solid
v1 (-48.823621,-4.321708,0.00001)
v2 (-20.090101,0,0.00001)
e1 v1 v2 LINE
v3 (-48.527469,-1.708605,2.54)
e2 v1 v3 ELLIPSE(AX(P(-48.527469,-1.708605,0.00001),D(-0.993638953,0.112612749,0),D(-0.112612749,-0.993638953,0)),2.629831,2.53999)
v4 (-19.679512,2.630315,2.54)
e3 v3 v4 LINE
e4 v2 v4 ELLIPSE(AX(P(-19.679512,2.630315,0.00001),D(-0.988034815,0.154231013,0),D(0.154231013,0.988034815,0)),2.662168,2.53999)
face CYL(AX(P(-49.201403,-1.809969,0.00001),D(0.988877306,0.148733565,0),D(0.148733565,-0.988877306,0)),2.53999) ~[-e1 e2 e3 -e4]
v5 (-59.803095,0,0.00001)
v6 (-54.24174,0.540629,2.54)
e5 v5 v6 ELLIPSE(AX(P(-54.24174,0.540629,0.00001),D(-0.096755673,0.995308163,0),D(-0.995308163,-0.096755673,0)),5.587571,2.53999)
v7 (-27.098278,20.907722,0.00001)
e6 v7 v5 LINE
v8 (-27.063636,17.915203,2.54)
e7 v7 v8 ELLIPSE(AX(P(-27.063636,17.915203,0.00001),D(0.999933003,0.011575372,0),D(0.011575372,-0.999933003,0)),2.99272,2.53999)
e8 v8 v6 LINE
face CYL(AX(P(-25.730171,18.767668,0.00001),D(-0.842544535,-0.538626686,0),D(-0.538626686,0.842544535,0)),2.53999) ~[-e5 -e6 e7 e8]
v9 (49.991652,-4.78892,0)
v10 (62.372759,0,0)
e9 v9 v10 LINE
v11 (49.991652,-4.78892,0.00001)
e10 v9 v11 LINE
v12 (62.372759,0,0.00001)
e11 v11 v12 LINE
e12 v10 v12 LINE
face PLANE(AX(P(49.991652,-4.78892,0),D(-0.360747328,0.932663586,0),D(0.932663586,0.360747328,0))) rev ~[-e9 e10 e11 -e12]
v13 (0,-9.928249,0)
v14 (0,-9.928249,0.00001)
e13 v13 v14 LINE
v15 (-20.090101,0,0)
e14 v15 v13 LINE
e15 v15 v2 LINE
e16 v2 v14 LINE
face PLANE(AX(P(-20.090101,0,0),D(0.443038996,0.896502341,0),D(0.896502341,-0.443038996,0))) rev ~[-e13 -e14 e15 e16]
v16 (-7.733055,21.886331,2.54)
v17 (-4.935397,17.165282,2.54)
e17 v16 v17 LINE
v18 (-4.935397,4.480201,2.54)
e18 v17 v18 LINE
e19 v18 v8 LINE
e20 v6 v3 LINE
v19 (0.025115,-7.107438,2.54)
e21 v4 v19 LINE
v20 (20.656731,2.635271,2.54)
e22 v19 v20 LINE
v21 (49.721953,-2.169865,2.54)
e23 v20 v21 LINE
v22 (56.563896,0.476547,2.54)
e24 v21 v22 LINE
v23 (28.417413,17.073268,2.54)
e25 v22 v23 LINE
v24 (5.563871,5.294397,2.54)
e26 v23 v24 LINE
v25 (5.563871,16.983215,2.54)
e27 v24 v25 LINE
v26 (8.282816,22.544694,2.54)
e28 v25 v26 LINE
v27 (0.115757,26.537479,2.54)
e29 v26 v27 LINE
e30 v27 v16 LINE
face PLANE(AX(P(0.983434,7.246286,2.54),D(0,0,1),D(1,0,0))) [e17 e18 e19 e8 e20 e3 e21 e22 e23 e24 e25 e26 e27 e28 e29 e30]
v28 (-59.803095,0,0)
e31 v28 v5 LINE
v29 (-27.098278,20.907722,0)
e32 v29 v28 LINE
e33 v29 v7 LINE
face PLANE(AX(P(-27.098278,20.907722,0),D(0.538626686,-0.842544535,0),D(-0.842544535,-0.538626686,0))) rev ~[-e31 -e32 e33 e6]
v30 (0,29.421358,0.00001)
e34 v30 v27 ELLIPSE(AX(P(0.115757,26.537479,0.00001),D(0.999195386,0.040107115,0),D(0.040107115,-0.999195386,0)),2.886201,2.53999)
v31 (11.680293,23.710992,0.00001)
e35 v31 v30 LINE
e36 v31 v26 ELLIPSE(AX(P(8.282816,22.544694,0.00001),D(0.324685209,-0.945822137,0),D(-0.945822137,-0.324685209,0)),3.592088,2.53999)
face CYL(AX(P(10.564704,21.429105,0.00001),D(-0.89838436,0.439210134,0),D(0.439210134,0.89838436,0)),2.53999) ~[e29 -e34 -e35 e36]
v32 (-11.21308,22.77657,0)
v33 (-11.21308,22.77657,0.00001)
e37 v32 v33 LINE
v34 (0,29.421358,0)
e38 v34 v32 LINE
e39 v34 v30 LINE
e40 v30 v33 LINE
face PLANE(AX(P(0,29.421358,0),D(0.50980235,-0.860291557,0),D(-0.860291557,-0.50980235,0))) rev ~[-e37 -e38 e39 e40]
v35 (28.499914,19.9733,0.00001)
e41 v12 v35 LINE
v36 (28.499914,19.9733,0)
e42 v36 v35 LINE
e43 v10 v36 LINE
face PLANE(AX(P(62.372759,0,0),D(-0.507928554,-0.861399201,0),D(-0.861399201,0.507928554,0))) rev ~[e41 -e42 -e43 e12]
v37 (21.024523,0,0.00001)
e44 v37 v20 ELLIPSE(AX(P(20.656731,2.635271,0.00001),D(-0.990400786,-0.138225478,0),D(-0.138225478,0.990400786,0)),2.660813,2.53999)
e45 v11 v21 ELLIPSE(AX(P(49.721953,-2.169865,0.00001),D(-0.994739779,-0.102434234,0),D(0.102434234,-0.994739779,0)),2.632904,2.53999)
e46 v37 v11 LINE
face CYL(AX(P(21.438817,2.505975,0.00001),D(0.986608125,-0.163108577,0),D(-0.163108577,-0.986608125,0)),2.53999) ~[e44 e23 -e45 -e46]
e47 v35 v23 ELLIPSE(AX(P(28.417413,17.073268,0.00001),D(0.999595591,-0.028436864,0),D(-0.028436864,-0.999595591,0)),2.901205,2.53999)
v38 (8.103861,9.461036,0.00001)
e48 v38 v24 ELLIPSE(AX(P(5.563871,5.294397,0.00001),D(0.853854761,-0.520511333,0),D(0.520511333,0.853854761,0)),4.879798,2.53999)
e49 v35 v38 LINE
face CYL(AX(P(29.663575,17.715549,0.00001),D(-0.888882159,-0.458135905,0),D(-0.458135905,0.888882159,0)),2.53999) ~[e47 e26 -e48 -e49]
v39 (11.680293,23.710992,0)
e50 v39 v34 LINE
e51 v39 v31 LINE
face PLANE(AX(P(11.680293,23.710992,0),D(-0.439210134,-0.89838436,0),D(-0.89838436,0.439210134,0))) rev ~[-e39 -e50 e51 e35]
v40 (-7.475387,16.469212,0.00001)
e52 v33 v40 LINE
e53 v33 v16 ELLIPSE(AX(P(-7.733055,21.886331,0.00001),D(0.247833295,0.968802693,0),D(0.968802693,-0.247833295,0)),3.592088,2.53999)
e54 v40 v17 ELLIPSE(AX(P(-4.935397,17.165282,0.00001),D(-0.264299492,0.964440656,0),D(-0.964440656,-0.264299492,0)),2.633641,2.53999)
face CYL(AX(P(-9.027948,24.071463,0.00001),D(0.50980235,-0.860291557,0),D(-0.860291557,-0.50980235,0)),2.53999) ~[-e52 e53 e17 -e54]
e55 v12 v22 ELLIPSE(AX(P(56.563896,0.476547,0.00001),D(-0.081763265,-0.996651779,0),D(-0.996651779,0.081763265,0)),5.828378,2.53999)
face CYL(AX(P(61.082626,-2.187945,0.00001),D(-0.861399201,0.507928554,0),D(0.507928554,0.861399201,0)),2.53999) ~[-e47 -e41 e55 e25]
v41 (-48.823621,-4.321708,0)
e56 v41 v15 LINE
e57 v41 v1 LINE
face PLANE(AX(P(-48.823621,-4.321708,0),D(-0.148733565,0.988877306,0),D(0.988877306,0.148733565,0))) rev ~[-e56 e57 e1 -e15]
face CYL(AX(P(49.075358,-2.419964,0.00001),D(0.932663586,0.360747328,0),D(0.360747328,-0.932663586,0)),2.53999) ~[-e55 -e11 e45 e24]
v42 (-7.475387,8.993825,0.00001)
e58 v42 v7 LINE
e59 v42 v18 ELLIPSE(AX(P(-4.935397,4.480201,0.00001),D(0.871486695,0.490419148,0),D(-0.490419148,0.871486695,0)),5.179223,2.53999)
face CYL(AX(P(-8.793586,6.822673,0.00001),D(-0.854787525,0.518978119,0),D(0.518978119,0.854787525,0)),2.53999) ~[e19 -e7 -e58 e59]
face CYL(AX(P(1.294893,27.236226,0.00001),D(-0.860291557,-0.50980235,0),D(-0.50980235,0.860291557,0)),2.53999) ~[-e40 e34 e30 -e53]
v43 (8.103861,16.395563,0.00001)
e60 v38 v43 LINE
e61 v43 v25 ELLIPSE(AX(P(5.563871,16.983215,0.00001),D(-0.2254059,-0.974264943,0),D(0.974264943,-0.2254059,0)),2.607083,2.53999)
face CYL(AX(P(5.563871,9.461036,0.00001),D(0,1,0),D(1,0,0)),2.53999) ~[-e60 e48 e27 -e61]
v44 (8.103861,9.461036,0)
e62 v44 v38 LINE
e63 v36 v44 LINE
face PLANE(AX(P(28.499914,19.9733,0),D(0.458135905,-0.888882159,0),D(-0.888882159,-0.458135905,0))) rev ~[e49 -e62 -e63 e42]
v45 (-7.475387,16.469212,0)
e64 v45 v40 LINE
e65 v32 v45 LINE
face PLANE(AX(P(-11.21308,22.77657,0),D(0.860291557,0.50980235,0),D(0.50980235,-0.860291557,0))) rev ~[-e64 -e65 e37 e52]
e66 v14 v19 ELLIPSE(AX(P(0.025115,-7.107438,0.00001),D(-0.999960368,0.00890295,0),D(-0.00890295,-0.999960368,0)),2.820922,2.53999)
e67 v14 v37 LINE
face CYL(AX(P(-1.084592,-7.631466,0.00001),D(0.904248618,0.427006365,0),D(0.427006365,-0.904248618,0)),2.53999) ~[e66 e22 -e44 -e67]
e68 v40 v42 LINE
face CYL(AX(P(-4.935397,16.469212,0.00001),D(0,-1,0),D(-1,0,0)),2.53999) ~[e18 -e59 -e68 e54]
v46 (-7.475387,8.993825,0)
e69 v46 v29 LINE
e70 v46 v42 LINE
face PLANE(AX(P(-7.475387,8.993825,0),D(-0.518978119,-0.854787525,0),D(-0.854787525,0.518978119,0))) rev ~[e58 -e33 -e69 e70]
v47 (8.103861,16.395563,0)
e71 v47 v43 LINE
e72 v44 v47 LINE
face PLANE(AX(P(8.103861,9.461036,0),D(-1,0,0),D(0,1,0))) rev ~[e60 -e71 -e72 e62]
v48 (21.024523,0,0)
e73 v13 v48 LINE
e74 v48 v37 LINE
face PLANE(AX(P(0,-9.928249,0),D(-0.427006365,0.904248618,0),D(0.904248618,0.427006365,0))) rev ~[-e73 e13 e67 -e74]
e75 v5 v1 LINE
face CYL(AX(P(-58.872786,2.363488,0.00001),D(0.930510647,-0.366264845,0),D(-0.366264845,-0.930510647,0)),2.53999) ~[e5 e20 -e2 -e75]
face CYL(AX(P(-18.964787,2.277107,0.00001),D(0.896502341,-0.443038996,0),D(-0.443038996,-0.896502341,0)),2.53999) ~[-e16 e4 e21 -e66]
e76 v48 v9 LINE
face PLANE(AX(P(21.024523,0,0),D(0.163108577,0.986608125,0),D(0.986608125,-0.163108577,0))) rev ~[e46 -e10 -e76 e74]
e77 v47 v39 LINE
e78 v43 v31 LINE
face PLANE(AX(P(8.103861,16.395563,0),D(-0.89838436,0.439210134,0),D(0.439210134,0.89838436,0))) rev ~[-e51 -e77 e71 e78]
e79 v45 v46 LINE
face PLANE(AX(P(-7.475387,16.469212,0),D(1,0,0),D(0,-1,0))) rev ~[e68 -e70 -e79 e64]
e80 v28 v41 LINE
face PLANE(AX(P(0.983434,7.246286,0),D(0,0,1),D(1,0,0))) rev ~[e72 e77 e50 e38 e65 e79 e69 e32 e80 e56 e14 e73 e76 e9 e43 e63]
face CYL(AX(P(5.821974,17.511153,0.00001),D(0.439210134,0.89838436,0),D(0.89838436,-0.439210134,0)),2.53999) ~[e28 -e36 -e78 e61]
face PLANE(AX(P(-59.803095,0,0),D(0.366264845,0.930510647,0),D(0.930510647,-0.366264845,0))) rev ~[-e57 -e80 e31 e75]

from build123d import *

# Parameters (mm, degrees)
F1_DEPTH = 2.54
F2_R     = 2.53999


# Not quite as in the source:
# - a fillet or chamfer is up to 0.001 mm smaller than in the source, because OpenCascade refuses the exact size


with BuildPart() as f1:
    # F0 (on Top) → F1 (new body)
    with BuildSketch(Plane.XY):
        Polygon((-27.0982775837, 20.9077224135), (-59.8030947149, 0), (-48.823621124, -4.3217078783), (-20.0901012868, 0), (0, -9.9282488227), (21.0245233029, 0), (49.9916523695, -4.7889198177), (62.3727589846, 0), (28.4999143332, 19.9733003974), (8.1038610589, 9.461035952), (8.1038610589, 16.395563461), (11.6802928969, 23.7109921873), (0, 29.4213576296), (-11.2130800262, 22.7765701711), (-7.4753868394, 16.4692122489), (-7.4753868394, 8.9938249439), align=None)
    extrude(amount=F1_DEPTH)

    # F2 (radius 2.54 in the source; OpenCascade refuses exactly that, so slightly less here)
    f2_edges = [f1.edges().sort_by_distance(p)[0] for p in [
        (-43.450686, 10.453861, 2.54),
        (-17.286832, 14.950774, 2.54),
        (-7.475387, 12.731519, 2.54),
        (-9.344233, 19.622891, 2.54),
        (-5.60654, 26.098964, 2.54),
        (5.840146, 26.566175, 2.54),
        (9.892077, 20.053278, 2.54),
        (8.103861, 12.9283, 2.54),
        (18.301888, 14.717168, 2.54),
        (45.436337, 9.98665, 2.54),
        (-54.313358, -2.160854, 2.54),
        (-34.456861, -2.160854, 2.54),
        (-10.045051, -4.964124, 2.54),
        (10.512262, -4.964124, 2.54),
        (35.508088, -2.39446, 2.54),
        (56.182206, -2.39446, 2.54),
    ]]
    fillet(f2_edges, radius=F2_R)


solid = f1.part
